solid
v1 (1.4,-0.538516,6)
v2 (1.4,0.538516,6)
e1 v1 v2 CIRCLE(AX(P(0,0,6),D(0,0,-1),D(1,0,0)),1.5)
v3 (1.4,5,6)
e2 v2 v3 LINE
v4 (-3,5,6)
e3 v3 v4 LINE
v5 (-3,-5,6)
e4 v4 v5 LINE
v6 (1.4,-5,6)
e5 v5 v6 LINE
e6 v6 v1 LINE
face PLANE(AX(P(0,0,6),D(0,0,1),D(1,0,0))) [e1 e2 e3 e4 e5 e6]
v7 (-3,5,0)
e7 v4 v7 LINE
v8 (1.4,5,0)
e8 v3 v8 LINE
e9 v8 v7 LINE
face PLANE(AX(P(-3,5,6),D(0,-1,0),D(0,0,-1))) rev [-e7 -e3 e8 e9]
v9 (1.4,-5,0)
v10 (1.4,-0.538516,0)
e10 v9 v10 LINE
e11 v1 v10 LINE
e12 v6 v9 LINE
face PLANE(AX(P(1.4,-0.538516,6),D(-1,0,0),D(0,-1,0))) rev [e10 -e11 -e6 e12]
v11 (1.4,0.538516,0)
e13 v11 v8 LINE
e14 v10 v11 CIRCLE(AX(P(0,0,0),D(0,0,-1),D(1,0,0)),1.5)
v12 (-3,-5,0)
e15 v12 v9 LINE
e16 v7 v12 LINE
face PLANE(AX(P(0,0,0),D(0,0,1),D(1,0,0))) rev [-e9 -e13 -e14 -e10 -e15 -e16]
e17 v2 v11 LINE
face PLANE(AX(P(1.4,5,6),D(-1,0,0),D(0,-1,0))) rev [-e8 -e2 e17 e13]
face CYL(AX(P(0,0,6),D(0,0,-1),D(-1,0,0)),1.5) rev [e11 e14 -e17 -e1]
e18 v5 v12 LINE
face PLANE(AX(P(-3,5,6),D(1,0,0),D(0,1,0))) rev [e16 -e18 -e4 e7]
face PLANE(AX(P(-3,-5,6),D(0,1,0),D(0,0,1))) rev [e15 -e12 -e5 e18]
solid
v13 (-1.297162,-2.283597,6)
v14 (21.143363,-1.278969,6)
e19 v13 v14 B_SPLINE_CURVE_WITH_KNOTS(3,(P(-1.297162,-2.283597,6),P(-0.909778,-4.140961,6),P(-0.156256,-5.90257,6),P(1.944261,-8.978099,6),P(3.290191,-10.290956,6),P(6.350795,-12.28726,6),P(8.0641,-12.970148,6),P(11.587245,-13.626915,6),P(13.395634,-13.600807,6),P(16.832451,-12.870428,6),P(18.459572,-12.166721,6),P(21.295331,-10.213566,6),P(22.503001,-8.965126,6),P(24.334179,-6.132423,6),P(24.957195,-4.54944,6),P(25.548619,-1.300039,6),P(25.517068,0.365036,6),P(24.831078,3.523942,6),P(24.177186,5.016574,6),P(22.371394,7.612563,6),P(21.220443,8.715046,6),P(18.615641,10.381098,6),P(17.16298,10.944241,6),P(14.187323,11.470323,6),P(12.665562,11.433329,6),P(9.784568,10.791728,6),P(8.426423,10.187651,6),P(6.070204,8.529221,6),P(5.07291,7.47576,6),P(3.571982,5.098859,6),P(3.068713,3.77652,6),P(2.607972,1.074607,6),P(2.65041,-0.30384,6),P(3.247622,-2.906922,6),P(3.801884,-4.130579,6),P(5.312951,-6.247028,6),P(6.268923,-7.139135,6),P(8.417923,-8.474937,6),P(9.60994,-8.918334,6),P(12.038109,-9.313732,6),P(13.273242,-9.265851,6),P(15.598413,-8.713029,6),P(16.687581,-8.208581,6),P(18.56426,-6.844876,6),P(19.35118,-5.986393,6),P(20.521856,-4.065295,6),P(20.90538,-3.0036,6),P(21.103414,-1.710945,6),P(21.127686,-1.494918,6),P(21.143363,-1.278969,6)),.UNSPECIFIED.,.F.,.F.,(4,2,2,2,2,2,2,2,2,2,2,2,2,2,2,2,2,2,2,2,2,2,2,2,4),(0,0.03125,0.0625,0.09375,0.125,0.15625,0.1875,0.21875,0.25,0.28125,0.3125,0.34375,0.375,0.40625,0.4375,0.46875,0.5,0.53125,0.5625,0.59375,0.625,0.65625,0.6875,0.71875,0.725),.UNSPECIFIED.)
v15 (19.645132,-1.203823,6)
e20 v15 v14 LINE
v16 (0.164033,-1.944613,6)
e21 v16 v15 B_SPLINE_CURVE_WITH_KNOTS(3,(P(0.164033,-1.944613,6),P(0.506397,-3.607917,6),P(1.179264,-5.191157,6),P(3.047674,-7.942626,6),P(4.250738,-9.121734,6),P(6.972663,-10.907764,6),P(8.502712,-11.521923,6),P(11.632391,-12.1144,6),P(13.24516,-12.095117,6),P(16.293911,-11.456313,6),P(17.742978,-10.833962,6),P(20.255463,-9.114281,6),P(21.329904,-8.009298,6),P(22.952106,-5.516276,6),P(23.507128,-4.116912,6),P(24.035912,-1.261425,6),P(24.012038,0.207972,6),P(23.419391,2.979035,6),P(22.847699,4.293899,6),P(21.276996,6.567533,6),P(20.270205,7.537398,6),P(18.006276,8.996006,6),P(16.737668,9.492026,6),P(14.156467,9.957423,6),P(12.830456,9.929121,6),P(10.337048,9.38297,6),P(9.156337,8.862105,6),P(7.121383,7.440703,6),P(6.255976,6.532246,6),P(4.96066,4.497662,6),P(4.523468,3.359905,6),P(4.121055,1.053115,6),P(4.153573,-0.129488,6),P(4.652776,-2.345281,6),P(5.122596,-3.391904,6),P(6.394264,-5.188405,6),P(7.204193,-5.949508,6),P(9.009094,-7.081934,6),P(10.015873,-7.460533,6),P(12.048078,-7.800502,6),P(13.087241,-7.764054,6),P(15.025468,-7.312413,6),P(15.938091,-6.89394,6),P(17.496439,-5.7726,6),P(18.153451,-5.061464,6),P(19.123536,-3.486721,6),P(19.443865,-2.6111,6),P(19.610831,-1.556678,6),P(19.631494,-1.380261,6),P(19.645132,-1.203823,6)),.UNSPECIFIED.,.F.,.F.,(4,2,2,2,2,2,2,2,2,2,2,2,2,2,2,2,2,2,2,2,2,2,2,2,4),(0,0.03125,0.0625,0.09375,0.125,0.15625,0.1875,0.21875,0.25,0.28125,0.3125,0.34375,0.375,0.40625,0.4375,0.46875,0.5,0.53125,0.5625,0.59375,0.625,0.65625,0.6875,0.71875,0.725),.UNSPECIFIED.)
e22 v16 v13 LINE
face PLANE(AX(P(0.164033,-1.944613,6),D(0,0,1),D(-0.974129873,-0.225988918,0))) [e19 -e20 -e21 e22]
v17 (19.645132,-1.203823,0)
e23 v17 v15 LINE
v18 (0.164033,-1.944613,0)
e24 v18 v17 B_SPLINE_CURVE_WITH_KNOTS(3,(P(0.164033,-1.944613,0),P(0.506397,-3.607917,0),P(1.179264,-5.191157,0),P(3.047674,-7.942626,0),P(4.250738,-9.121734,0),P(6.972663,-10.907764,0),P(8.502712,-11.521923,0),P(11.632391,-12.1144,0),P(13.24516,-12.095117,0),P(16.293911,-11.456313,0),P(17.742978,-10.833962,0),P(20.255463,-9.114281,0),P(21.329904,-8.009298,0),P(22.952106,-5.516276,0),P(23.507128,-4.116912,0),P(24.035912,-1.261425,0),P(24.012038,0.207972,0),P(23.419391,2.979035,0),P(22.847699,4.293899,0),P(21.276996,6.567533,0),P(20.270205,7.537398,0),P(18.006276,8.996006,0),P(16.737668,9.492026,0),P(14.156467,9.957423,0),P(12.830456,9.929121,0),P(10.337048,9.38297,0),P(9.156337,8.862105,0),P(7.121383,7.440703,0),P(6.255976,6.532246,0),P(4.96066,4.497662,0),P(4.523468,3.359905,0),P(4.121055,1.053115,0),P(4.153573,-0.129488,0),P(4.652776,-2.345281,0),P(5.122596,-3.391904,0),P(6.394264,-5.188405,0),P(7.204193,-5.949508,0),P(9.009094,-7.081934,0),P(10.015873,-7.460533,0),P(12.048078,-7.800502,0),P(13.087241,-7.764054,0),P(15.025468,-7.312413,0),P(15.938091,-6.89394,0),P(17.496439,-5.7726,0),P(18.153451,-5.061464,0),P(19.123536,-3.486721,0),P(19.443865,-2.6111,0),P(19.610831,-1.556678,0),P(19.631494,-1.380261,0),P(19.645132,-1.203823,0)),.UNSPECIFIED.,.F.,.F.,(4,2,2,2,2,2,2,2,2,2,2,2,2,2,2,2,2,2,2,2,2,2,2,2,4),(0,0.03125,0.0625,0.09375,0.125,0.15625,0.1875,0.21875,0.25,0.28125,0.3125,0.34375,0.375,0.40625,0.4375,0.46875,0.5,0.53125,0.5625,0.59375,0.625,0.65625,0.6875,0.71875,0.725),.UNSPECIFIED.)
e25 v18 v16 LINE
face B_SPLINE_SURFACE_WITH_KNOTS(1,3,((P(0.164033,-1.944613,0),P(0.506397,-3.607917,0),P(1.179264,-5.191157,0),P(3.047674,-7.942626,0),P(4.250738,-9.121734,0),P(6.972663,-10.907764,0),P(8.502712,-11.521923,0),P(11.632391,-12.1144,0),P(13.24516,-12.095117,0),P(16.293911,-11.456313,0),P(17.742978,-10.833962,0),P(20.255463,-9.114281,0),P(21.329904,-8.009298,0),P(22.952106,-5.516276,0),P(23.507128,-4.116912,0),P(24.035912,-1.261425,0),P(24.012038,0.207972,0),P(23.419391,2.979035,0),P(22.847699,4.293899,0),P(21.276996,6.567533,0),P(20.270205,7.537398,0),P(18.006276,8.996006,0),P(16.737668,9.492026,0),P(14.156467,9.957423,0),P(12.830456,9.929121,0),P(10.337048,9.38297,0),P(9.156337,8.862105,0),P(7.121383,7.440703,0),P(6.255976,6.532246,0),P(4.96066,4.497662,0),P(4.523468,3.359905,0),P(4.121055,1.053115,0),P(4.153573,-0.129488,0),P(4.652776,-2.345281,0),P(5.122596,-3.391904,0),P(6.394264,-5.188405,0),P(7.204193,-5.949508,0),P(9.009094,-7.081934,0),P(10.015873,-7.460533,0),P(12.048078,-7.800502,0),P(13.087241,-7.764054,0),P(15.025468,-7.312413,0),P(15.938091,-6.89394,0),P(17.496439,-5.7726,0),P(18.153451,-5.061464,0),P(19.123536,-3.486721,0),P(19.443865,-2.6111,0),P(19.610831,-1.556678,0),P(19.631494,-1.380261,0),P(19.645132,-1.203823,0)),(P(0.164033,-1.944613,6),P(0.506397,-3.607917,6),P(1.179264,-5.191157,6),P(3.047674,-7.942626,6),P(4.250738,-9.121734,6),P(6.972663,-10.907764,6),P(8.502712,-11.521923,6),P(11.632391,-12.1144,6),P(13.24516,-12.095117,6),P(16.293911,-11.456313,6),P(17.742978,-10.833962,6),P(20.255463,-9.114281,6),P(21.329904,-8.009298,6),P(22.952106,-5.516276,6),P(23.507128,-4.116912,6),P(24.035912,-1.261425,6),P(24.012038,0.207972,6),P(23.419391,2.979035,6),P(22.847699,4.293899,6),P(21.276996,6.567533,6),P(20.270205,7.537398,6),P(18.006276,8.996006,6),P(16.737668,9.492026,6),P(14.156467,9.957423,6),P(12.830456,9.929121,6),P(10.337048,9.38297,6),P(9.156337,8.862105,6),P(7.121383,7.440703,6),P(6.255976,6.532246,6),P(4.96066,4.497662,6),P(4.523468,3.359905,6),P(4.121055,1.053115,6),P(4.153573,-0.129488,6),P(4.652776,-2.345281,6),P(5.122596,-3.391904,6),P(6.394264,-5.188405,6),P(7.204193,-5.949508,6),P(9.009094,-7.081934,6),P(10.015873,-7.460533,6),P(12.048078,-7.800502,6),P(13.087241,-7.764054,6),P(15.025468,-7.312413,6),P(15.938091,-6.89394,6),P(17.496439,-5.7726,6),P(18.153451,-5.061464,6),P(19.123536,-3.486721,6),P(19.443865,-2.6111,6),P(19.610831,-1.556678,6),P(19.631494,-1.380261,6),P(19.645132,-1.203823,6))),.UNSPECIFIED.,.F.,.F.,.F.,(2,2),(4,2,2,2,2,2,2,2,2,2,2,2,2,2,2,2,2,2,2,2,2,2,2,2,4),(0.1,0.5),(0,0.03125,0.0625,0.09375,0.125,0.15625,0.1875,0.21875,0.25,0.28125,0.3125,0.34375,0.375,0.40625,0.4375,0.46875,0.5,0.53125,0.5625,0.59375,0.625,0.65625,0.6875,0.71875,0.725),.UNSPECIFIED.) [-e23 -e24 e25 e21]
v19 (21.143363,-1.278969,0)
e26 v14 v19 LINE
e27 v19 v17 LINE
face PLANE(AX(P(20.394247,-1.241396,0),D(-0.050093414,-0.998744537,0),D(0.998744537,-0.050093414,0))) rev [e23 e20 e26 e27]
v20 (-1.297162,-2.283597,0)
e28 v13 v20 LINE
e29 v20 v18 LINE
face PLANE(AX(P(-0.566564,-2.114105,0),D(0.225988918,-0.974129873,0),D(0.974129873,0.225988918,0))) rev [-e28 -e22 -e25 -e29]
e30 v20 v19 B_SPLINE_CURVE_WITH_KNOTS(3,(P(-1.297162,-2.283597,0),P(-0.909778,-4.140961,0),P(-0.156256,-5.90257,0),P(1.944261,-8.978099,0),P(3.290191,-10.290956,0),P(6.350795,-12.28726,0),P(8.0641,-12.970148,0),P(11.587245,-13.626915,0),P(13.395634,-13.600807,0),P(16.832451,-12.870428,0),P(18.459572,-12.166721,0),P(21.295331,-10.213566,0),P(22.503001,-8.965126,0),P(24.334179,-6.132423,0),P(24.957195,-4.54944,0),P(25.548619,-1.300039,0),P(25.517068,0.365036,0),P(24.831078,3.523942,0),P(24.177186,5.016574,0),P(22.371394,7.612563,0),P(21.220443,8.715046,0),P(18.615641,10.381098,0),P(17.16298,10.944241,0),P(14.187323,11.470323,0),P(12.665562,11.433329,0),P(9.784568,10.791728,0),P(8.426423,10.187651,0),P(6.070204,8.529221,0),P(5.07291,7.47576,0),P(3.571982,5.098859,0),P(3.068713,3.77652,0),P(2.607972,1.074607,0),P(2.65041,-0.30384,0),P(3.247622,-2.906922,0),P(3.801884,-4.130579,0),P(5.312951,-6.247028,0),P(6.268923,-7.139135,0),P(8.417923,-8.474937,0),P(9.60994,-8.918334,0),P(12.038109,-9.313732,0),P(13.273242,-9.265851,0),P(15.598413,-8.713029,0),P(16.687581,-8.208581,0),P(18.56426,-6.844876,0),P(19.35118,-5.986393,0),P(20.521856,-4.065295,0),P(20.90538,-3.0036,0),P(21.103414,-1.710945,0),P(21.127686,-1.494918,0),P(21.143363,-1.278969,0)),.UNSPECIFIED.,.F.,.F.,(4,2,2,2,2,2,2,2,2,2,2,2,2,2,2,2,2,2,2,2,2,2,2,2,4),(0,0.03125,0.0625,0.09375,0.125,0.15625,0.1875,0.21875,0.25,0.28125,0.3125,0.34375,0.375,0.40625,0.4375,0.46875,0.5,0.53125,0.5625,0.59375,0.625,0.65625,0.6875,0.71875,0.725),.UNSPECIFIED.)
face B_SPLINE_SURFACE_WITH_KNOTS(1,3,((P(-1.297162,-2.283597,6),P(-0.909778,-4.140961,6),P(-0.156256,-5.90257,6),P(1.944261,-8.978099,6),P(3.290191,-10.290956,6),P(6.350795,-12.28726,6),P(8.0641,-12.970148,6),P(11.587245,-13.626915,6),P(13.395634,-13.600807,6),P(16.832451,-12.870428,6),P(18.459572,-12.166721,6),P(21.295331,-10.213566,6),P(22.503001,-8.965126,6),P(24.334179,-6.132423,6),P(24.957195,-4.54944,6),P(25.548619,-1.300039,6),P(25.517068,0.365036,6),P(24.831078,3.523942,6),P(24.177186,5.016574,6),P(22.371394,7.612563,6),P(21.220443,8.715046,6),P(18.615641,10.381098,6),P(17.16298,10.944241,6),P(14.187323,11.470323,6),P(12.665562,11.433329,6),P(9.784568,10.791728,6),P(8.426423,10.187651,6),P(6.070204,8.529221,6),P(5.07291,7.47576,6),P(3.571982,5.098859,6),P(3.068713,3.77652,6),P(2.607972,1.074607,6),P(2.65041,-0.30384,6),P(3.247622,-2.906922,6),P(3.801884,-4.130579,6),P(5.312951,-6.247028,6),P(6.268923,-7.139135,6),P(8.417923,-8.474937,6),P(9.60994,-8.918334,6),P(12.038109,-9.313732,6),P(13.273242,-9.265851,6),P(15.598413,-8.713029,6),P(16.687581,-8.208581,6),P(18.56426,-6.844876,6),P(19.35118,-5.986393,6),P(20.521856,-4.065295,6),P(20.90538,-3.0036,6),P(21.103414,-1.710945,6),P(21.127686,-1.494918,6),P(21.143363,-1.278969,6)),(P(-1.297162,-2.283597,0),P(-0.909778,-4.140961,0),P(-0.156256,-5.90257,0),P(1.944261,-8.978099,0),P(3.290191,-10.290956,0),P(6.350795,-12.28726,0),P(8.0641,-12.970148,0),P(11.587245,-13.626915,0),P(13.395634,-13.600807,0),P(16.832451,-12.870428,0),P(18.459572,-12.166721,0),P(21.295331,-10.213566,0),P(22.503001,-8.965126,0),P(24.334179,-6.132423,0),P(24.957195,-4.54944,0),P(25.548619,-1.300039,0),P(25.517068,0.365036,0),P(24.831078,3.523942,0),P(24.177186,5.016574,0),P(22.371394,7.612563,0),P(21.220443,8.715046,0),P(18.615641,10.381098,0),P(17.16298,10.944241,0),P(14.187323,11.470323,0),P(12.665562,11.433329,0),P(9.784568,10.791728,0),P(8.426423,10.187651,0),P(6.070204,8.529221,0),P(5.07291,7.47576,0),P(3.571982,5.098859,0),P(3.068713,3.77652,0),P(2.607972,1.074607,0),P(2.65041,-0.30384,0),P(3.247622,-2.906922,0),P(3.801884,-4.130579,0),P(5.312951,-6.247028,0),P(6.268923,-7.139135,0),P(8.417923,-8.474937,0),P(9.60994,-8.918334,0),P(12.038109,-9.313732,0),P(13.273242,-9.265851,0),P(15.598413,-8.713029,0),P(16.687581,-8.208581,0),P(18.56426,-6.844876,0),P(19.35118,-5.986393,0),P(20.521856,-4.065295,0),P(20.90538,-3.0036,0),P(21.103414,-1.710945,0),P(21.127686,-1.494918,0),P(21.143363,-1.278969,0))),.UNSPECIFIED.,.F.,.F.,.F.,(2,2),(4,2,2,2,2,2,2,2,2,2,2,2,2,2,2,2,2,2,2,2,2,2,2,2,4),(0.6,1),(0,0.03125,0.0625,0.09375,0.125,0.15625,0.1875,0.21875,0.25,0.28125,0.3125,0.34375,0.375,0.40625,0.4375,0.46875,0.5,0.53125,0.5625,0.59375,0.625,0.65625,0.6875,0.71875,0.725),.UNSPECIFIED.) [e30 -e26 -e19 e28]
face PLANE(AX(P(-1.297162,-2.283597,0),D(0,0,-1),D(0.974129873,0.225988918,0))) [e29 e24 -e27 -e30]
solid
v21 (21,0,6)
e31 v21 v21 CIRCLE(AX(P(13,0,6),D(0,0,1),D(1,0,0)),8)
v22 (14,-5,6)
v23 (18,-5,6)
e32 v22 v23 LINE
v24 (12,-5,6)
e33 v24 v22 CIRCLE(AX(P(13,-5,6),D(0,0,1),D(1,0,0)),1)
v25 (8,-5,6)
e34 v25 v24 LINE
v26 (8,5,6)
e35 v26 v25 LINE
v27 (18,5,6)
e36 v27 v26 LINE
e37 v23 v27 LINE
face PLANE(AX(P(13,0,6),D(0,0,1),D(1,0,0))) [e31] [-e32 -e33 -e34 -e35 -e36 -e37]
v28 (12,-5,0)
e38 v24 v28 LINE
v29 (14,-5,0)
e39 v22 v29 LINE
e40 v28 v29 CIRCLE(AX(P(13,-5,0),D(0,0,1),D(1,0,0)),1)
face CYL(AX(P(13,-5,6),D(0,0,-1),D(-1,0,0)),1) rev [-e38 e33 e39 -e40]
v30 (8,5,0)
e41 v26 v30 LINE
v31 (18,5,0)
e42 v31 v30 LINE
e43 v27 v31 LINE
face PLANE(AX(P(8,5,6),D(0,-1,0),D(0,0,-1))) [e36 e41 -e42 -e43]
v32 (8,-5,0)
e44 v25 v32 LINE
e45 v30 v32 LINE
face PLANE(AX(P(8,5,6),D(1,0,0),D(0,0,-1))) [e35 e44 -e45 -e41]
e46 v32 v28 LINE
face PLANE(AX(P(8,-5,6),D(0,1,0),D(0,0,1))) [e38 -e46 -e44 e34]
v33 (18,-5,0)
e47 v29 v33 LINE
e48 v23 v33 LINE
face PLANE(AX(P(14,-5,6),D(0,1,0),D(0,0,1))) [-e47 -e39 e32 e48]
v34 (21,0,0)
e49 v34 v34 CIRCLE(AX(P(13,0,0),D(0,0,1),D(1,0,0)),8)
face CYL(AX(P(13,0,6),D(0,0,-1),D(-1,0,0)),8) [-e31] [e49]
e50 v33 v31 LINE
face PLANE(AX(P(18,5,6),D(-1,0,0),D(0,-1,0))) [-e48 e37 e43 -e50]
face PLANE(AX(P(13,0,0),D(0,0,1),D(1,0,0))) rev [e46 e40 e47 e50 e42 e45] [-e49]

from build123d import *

# Parameters (mm, degrees)
ESQUISSE1_R          = 8
BOSS_EXTRU_1_DEPTH   = 6
BOSS_EXTRU_1_2_DEPTH = 6
BALAYAGE2_DEPTH      = 6


# Read off the part's stored shape, not the designer's step: Balayage2
with BuildPart() as part:
    # Esquisse1 → Boss.-Extru.1 (new body)
    with BuildSketch(Plane.XY):
        with Locations((13, 0)):
            Circle(ESQUISSE1_R)
        with BuildLine():
            Line((8, 5), (18, 5))
            Line((18, 5), (18, -5))
            Line((18, -5), (14, -5))
            ThreePointArc((14, -5), (13, -6), (12, -5))
            Line((12, -5), (8, -5))
            Line((8, -5), (8, 5))
        make_face(mode=Mode.SUBTRACT)
    extrude(amount=BOSS_EXTRU_1_DEPTH)


with BuildPart() as body_2:
    # Esquisse1 → Boss.-Extru.1 2 (new body)
    with BuildSketch(Plane.XY):
        with BuildLine():
            Line((1.4, -0.538516481), (1.4, -5))
            Line((1.4, -5), (-3, -5))
            Line((-3, -5), (-3, 5))
            Line((-3, 5), (1.4, 5))
            Line((1.4, 5), (1.4, 0.538516481))
            ThreePointArc((1.4, 0.538516481), (-1.5, 0), (1.4, -0.538516481))
        make_face()
    extrude(amount=BOSS_EXTRU_1_2_DEPTH)


with BuildPart() as body_3:
    # Balayage2 outline → Balayage2 (new body)
    with BuildSketch(Plane.XY):
        with BuildLine():
            add(Edge.make_bspline(
                [(0.164032959, -1.944613303), (0.506396871, -3.607917309), (1.179264256, -5.191157109), (3.047673522, -7.942626067), (4.250737694, -9.121734152), (6.972663129, -10.907763689), (8.502712432, -11.521923081), (11.632391284, -12.114400381), (13.245160201, -12.095116805), (16.293911252, -11.456313422), (17.742978472, -10.833961583), (20.255462917, -9.114280759), (21.329903585, -8.009298257), (22.952106044, -5.516275925), (23.507128331, -4.116911793), (24.03591202, -1.261425329), (24.012038287, 0.207972321), (23.419390884, 2.979035431), (22.847699176, 4.293899166), (21.276995762, 6.567533081), (20.270204714, 7.537397657), (18.006276178, 8.996005989), (16.737668249, 9.492025714), (14.15646747, 9.957422926), (12.830456425, 9.929120623), (10.337048374, 9.382970361), (9.156337469, 8.862104635), (7.121382564, 7.440702529), (6.25597634, 6.532246348), (4.960660127, 4.497662357), (4.523467736, 3.359904651), (4.121054986, 1.053114865), (4.153573493, -0.129487918), (4.652775889, -2.345280923), (5.122595608, -3.391904446), (6.394264145, -5.188404917), (7.204193135, -5.949508251), (9.00909367, -7.081933797), (10.015873084, -7.46053305), (12.048078293, -7.800501926), (13.08724114, -7.764054172), (15.025467999, -7.31241257), (15.93809075, -6.893939546), (17.496438918, -5.77259963), (18.153450642, -5.061464122), (19.123535686, -3.486720775), (19.443864865, -2.611100331), (19.610830691, -1.556677813), (19.631493768, -1.380261161), (19.645132136, -1.203823372)],
                knots=[0, 0, 0, 0, 0.03125, 0.03125, 0.0625, 0.0625, 0.09375, 0.09375, 0.125, 0.125, 0.15625, 0.15625, 0.1875, 0.1875, 0.21875, 0.21875, 0.25, 0.25, 0.28125, 0.28125, 0.3125, 0.3125, 0.34375, 0.34375, 0.375, 0.375, 0.40625, 0.40625, 0.4375, 0.4375, 0.46875, 0.46875, 0.5, 0.5, 0.53125, 0.53125, 0.5625, 0.5625, 0.59375, 0.59375, 0.625, 0.625, 0.65625, 0.65625, 0.6875, 0.6875, 0.71875, 0.71875, 0.725, 0.725, 0.725, 0.725], degree=3))
            Line((0.164032959, -1.944613303), (-1.29716185, -2.28359668))
            add(Edge.make_bspline(
                [(-1.29716185, -2.28359668), (-0.90977771, -4.140961303), (-0.156255725, -5.902570174), (1.944261379, -8.978098829), (3.290191193, -10.290956062), (6.350794548, -12.287259596), (8.064099774, -12.97014824), (11.58724489, -13.626914518), (13.395634143, -13.600806998), (16.832451461, -12.870427931), (18.459572331, -12.166720864), (21.295331058, -10.21356614), (22.503000825, -8.965125738), (24.334178971, -6.132423448), (24.957194652, -4.549440195), (25.548618925, -1.300038958), (25.517068059, 0.3650361), (24.831078099, 3.523941749), (24.177186004, 5.016574488), (22.371393659, 7.612563288), (21.220442669, 8.715045588), (18.615641443, 10.381098348), (17.162980163, 10.944241063), (14.187322806, 11.470323333), (12.665561943, 11.433329119), (9.784567964, 10.791728267), (8.426423355, 10.187651143), (6.070204482, 8.529221179), (5.072909649, 7.475759599), (3.571982276, 5.09885944), (3.068712527, 3.776520132), (2.607972259, 1.074606654), (2.650409821, -0.303840013), (3.247621563, -2.906922324), (3.801883719, -4.130578802), (5.312951301, -6.247027749), (6.268923471, -7.139135113), (8.417922564, -8.474937102), (9.6099399, -8.918333882), (12.038109497, -9.313732151), (13.27324197, -9.265851237), (15.598412611, -8.713028607), (16.687580958, -8.208581419), (18.56425998, -6.84487622), (19.351179873, -5.986393458), (20.52185648, -4.065295434), (20.90538029, -3.003600068), (21.103414053, -1.710944638), (21.127685584, -1.49491785), (21.143362698, -1.278969198)],
                knots=[0, 0, 0, 0, 0.03125, 0.03125, 0.0625, 0.0625, 0.09375, 0.09375, 0.125, 0.125, 0.15625, 0.15625, 0.1875, 0.1875, 0.21875, 0.21875, 0.25, 0.25, 0.28125, 0.28125, 0.3125, 0.3125, 0.34375, 0.34375, 0.375, 0.375, 0.40625, 0.40625, 0.4375, 0.4375, 0.46875, 0.46875, 0.5, 0.5, 0.53125, 0.53125, 0.5625, 0.5625, 0.59375, 0.59375, 0.625, 0.625, 0.65625, 0.65625, 0.6875, 0.6875, 0.71875, 0.71875, 0.725, 0.725, 0.725, 0.725], degree=3))
            Line((21.143362698, -1.278969198), (19.645132136, -1.203823372))
        make_face()
    extrude(amount=BALAYAGE2_DEPTH)


solid = Compound([part.part, body_2.part, body_3.part])
